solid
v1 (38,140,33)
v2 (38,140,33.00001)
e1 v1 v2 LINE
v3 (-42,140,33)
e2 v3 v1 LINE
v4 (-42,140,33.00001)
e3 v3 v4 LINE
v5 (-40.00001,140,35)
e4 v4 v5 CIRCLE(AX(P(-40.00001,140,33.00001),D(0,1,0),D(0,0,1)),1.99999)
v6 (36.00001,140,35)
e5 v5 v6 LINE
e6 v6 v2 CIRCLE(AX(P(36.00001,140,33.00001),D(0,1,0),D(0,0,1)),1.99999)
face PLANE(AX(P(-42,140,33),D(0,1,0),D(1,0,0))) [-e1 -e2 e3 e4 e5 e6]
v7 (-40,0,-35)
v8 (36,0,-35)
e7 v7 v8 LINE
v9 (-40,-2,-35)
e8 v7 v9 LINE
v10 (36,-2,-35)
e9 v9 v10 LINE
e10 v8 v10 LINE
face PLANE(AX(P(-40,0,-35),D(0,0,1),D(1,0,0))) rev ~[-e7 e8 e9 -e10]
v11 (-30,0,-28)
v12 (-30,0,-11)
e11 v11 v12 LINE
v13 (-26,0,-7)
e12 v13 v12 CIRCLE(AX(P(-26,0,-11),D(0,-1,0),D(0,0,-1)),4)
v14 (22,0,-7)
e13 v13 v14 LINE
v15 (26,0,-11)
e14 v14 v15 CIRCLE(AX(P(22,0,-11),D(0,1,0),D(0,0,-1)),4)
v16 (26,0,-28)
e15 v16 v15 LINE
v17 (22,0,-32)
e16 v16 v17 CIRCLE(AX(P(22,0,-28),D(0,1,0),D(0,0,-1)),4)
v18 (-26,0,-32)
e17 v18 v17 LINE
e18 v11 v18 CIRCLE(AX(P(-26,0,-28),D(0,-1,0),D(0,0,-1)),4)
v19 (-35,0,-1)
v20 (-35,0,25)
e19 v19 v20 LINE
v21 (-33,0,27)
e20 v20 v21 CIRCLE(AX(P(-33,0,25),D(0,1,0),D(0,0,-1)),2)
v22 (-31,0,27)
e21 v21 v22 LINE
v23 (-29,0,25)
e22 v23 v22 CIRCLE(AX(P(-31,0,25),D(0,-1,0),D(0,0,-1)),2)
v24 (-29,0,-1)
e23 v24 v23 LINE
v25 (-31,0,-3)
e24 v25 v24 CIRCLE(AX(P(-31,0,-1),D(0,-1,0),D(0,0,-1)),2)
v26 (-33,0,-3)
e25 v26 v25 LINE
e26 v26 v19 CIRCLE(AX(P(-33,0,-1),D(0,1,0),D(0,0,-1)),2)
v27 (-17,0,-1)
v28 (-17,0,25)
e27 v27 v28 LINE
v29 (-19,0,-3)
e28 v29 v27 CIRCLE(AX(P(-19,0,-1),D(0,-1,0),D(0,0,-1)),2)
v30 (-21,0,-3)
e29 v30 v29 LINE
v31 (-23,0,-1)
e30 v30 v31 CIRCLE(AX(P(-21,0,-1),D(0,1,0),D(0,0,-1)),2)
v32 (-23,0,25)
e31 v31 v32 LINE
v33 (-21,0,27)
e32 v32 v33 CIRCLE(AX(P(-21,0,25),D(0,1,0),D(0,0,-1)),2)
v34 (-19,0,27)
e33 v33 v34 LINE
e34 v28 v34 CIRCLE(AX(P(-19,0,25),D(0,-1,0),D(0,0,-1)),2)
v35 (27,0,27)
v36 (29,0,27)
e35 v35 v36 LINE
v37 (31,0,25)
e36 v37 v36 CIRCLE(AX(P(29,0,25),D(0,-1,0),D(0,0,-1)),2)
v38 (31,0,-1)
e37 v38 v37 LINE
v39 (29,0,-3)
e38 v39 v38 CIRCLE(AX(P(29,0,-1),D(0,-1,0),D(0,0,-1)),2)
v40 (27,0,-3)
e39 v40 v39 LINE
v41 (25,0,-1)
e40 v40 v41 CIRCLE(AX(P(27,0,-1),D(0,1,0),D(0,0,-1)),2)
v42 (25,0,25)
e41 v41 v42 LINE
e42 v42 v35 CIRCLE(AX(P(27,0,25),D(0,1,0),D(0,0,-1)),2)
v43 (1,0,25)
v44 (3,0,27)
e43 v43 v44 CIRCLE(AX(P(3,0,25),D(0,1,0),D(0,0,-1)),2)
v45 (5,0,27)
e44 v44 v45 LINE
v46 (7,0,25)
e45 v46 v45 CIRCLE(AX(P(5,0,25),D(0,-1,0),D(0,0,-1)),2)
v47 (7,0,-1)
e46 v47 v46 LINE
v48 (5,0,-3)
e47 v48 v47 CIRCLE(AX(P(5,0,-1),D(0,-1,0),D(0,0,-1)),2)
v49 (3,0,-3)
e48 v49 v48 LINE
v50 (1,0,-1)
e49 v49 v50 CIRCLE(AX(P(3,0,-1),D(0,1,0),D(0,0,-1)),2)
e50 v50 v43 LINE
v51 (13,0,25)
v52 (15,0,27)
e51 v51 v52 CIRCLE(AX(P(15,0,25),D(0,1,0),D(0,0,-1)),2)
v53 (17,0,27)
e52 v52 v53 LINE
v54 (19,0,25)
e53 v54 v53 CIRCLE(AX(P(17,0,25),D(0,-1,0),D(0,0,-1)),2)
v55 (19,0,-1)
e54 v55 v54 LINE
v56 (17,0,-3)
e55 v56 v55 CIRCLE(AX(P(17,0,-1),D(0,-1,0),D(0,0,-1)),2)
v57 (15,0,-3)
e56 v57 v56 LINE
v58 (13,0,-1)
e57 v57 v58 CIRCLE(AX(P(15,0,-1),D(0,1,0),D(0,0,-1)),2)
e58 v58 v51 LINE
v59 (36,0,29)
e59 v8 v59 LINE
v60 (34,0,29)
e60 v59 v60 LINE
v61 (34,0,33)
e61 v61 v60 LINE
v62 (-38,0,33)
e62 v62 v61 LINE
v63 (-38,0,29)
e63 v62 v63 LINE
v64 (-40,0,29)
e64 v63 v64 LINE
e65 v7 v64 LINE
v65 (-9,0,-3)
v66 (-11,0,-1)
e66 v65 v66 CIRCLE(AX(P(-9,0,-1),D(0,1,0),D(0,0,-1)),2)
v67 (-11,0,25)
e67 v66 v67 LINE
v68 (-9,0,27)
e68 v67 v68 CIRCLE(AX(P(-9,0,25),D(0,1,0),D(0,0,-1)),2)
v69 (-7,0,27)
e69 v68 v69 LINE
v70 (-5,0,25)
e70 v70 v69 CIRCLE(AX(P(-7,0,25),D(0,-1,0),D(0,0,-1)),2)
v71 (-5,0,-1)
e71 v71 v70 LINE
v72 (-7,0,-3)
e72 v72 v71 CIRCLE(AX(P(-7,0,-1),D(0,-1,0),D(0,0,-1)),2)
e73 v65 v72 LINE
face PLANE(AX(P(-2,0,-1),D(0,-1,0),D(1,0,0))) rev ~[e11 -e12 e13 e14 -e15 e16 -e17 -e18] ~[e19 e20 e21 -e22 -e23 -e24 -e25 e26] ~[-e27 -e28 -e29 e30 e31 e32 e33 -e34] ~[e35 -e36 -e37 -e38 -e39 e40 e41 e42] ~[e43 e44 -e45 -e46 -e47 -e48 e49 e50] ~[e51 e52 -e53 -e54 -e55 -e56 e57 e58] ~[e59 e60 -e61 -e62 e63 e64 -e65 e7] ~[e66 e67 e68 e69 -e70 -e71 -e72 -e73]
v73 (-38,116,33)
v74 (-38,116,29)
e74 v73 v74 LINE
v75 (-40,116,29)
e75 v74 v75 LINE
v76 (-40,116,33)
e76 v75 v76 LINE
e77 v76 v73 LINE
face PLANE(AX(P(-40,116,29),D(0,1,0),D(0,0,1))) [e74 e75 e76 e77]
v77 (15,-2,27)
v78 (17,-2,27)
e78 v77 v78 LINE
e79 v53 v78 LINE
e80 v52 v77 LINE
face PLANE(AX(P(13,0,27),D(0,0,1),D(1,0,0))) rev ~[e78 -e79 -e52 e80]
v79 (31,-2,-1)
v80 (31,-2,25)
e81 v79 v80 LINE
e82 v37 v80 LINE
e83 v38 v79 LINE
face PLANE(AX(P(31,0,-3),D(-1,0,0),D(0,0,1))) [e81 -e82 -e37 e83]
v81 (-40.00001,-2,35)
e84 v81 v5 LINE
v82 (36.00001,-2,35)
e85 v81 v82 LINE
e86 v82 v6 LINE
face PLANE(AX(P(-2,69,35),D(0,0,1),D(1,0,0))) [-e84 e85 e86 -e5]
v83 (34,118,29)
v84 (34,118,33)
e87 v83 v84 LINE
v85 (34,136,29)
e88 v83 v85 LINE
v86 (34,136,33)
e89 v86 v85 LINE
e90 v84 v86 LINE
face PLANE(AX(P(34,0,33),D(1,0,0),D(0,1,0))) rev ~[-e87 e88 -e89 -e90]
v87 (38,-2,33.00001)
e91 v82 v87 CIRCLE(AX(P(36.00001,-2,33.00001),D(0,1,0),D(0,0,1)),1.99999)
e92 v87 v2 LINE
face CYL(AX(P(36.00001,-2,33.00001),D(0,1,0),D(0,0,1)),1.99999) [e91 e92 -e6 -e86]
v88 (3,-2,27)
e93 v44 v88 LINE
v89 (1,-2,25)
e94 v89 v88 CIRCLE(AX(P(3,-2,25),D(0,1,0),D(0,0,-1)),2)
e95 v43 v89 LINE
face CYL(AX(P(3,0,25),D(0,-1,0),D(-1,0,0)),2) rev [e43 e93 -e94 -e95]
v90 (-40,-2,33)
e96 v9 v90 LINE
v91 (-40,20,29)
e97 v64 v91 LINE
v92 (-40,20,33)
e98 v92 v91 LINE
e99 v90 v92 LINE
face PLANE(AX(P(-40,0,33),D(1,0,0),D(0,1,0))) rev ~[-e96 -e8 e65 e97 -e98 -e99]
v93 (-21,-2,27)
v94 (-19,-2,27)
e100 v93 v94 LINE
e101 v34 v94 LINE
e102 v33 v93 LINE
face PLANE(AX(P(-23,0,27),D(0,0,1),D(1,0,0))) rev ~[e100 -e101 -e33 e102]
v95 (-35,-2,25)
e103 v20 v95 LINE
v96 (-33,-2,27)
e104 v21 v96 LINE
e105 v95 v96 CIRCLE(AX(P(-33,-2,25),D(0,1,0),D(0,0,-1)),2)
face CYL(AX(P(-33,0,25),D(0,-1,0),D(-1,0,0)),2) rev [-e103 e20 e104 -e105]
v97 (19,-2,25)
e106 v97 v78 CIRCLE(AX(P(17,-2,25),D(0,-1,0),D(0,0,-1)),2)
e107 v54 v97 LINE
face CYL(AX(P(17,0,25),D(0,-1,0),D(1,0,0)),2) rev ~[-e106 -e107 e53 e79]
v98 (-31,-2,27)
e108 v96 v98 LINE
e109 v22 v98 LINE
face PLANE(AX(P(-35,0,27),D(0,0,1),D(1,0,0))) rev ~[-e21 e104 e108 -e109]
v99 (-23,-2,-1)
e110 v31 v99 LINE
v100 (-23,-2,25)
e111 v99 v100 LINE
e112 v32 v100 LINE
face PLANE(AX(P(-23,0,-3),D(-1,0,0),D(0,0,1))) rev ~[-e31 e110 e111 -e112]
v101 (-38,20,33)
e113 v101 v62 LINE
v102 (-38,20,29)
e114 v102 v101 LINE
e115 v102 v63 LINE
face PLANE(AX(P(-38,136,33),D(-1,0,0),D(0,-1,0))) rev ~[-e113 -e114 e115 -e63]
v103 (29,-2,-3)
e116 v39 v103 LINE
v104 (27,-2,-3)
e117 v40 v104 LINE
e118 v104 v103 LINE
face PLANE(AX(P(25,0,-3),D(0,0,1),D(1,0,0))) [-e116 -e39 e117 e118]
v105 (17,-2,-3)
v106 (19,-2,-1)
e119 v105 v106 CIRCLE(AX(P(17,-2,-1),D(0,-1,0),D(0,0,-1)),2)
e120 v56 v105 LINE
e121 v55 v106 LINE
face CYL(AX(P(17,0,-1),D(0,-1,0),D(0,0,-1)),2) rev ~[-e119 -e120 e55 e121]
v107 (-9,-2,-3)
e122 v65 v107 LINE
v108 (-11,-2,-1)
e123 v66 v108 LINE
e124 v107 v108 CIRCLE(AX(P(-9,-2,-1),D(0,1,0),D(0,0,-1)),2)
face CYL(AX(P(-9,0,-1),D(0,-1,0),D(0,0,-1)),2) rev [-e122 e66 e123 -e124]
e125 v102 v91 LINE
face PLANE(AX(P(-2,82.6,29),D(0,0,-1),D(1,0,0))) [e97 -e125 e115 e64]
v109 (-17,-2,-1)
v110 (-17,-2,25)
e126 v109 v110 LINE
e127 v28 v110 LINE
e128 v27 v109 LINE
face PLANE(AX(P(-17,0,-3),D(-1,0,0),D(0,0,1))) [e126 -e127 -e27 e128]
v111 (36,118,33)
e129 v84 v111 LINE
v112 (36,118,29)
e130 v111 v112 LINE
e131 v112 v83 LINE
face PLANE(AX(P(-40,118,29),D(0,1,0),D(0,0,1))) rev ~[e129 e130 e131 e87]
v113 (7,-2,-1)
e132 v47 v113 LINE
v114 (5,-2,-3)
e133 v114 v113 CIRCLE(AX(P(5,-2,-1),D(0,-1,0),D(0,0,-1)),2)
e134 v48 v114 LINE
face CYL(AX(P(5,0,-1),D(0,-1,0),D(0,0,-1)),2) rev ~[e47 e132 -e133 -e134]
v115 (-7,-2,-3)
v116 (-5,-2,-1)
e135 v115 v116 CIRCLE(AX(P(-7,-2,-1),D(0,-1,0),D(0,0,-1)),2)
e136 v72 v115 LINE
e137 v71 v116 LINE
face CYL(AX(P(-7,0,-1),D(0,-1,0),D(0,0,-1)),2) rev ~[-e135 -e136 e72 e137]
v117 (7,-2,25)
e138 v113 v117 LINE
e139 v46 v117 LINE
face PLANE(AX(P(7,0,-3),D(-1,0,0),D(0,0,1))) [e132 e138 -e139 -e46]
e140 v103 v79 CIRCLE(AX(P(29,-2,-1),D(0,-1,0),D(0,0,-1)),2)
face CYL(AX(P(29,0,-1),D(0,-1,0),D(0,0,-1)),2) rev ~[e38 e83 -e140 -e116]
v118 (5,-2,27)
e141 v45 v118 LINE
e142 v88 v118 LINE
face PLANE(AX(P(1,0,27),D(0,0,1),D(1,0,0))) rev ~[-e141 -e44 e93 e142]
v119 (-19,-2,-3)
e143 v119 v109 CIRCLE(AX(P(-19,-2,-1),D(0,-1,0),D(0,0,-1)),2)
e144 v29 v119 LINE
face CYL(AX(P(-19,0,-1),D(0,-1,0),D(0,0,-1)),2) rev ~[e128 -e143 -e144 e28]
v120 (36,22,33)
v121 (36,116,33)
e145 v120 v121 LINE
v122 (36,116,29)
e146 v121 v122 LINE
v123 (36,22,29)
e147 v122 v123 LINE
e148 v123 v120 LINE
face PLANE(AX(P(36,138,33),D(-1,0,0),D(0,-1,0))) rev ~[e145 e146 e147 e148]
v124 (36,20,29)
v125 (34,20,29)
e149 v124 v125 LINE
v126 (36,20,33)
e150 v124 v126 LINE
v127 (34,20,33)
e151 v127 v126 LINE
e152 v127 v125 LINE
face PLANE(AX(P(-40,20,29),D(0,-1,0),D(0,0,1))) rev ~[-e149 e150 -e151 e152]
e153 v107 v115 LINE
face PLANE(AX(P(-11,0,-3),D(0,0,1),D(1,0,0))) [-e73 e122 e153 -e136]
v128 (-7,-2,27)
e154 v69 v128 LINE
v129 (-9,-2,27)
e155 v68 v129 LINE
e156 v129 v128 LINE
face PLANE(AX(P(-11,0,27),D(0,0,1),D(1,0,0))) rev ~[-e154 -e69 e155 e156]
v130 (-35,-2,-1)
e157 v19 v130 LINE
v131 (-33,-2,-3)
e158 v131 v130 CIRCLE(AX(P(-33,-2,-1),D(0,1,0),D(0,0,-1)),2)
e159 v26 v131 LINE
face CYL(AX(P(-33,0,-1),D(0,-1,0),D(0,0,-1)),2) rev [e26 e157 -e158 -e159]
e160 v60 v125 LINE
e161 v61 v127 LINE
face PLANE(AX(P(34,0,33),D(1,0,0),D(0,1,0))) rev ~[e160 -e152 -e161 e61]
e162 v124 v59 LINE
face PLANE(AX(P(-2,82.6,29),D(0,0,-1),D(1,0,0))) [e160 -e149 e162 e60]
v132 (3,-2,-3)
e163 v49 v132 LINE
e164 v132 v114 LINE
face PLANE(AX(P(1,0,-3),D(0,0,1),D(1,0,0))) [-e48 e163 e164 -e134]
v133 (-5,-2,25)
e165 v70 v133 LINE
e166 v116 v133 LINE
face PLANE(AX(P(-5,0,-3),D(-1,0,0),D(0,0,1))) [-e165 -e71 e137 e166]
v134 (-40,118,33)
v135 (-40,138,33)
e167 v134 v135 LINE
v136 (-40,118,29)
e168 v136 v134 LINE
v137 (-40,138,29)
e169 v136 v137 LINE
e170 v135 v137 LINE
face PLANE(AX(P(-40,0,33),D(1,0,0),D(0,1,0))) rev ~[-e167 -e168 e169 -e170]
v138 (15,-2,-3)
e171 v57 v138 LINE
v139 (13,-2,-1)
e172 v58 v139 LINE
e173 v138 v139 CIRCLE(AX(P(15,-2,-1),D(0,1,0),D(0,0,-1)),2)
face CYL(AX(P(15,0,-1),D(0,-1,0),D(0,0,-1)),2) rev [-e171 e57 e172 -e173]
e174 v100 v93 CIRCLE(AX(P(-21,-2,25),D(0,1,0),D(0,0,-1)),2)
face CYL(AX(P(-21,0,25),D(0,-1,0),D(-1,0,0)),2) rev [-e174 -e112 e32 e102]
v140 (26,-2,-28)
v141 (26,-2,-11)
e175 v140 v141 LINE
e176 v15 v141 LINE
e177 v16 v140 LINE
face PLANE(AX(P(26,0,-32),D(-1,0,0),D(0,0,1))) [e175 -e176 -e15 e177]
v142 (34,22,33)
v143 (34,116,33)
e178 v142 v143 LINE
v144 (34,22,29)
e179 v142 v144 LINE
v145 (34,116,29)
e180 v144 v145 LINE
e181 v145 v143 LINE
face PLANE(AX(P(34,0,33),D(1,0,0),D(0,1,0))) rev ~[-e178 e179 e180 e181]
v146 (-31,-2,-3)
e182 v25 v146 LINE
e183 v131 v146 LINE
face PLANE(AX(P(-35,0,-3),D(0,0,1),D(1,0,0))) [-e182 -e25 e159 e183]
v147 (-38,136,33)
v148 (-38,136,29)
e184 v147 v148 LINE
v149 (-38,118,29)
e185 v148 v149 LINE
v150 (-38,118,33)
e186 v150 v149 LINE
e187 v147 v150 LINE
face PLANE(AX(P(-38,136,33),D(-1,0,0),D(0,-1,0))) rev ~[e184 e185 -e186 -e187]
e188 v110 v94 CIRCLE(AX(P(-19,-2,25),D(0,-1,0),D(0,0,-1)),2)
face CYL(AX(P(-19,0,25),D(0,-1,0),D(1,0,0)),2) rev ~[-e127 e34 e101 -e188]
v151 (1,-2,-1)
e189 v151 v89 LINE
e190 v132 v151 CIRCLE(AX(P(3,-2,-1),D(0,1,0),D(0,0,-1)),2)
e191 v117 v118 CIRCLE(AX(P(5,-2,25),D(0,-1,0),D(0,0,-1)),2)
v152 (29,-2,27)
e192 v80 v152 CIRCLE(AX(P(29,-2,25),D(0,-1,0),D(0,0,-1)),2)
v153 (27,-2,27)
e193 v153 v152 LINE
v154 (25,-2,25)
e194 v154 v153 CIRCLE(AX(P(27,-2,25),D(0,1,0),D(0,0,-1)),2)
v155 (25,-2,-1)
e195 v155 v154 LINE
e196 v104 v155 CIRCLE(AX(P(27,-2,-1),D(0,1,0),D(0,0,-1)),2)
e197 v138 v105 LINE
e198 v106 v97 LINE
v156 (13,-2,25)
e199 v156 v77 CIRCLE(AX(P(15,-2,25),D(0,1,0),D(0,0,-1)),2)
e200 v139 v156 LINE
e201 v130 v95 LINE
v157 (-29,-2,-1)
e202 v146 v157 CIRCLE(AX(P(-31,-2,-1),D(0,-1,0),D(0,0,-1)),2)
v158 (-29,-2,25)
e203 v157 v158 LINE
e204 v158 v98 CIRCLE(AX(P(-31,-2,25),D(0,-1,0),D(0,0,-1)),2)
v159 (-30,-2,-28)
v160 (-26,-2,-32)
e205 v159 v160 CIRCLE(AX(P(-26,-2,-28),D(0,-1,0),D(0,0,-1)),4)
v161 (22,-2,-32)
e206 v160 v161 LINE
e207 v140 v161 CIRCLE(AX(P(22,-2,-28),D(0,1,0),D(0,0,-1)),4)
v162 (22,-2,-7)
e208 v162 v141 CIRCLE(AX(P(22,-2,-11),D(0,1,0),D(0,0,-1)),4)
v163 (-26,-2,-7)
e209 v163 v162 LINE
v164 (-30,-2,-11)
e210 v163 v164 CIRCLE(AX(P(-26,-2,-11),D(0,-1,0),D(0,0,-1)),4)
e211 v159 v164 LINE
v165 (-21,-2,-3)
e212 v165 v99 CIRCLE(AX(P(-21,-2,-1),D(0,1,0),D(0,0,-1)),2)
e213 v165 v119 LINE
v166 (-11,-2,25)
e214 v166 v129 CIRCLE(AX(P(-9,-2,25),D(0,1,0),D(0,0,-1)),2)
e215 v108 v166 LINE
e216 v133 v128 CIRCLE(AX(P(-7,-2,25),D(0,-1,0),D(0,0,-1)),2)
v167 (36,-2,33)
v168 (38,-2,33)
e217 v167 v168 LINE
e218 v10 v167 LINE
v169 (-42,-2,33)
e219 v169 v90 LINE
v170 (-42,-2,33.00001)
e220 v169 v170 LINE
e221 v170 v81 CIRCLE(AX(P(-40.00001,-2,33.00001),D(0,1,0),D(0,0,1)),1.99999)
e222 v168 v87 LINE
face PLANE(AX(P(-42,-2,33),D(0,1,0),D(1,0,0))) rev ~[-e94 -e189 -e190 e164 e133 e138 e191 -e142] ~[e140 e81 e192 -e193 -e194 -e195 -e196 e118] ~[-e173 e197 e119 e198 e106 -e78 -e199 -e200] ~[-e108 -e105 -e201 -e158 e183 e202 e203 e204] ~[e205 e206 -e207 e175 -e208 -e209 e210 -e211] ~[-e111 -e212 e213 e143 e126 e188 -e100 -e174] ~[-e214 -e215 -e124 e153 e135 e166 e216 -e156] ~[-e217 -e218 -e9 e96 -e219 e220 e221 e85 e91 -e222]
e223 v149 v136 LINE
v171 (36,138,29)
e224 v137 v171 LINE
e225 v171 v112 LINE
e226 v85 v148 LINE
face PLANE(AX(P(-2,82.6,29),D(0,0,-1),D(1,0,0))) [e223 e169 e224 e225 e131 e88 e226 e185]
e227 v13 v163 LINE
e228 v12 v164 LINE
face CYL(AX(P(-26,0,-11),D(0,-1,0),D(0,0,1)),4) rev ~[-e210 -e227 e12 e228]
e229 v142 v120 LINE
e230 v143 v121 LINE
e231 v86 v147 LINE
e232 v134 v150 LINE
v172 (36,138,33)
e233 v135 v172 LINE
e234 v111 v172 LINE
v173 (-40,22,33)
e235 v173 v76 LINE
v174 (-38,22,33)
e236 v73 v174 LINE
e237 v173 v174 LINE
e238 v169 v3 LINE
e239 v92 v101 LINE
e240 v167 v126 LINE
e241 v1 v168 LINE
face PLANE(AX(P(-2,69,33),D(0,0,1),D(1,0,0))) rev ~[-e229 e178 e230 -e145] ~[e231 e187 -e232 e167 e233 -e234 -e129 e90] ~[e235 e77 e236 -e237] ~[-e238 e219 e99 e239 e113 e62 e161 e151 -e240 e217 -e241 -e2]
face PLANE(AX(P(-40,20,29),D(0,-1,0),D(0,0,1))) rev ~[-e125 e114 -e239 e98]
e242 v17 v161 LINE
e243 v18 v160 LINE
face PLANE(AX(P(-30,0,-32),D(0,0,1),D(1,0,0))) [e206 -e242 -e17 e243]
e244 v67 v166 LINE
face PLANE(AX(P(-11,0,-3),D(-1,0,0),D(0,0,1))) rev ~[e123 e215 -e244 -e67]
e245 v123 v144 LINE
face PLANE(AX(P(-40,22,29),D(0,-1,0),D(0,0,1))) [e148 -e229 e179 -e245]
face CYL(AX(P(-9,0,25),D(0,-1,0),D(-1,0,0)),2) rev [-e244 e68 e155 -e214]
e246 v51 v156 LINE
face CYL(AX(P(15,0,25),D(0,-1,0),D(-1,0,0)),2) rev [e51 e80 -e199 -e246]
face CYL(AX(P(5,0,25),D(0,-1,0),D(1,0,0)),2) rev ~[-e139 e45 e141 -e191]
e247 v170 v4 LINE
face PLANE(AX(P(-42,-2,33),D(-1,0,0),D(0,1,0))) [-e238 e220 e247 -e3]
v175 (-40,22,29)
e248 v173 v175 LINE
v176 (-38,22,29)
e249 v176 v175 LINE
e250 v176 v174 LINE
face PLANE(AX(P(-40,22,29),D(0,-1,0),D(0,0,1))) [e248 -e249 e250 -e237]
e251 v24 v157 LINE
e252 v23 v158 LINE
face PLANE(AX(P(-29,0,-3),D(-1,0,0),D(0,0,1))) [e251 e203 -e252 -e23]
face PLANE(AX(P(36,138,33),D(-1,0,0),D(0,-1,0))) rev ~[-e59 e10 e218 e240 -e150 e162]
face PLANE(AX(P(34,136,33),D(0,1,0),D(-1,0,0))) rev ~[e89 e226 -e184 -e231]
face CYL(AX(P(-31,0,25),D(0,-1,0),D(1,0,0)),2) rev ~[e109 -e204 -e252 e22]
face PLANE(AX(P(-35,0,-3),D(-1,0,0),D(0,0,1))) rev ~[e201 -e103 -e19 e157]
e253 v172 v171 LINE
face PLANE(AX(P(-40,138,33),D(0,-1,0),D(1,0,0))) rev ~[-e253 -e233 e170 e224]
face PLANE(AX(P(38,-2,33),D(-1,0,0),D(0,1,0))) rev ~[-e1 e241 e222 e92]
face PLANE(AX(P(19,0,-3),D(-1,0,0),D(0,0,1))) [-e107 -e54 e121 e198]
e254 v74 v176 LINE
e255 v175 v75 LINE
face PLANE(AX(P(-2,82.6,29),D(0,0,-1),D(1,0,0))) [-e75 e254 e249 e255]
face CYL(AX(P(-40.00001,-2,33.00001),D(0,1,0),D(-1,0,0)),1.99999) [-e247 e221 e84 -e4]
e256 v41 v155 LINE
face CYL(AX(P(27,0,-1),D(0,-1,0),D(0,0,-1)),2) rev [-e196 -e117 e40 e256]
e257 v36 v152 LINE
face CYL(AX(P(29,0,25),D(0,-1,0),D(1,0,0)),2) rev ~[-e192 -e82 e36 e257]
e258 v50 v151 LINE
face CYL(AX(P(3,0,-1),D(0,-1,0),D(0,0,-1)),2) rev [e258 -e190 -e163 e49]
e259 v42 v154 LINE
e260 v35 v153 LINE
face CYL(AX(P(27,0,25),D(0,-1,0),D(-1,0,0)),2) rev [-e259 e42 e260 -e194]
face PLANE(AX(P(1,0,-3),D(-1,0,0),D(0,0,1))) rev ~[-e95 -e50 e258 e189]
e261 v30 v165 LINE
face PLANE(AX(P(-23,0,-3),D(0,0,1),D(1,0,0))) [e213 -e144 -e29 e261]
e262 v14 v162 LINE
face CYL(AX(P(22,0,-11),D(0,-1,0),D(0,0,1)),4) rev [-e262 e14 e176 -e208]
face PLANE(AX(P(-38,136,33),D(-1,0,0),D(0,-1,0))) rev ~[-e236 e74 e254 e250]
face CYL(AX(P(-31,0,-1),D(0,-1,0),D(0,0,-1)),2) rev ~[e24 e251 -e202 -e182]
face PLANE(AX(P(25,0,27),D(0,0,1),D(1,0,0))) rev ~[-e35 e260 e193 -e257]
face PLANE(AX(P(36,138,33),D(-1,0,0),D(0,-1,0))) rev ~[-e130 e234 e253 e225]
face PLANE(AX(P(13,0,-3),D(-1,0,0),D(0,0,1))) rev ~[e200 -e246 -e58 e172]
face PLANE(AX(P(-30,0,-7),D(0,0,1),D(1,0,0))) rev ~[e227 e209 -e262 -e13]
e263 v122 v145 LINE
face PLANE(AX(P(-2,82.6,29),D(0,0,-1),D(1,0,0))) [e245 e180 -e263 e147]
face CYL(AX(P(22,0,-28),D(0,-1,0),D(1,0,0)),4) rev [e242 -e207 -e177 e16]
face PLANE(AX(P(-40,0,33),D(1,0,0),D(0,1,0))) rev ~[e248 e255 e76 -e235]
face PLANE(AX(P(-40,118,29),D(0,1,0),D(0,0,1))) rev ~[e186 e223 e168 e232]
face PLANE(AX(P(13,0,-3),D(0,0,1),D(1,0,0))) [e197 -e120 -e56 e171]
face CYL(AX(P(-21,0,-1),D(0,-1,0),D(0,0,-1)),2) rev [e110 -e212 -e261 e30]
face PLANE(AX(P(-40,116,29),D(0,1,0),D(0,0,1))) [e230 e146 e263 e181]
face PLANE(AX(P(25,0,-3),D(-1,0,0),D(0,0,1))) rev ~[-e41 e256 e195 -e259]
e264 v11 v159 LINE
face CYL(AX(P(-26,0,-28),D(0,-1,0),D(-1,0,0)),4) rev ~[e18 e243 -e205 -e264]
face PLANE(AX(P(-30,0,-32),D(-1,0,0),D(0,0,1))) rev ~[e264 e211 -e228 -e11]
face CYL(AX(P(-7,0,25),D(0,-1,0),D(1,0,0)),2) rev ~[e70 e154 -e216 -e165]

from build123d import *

# Parameters (mm, degrees)
F0_W      = 76
F0_H      = 68
F0_W_2    = 56
F0_H_2    = 25
F0_W_3    = 6
F0_H_3    = 30
F1_DEPTH  = 2
F2_W      = 80
F2_H      = 142
F3_DEPTH  = 2
F4_R      = 1.99999
F6_DEPTH  = 4
F7_R      = 4
F8_R      = 2
F9_W      = 2
F9_H      = 4
F10_DEPTH = 100


# Not quite as in the source:
# - a fillet or chamfer is up to 0.001 mm smaller than in the source, because OpenCascade refuses the exact size


with BuildPart() as f1:
    # F0 (on Front) → F1 (new body)
    with BuildSketch(Plane.XZ):
        with Locations((-2, -1)):
            Rectangle(F0_W, F0_H)
        with Locations((-2, -19.5)):
            Rectangle(F0_W_2, F0_H_2, mode=Mode.SUBTRACT)
        with Locations((-32, 12)):
            Rectangle(F0_W_3, F0_H_3, mode=Mode.SUBTRACT)
        with Locations((-20, 12)):
            Rectangle(F0_W_3, F0_H_3, mode=Mode.SUBTRACT)
        with Locations((-8, 12)):
            Rectangle(F0_W_3, F0_H_3, mode=Mode.SUBTRACT)
        with Locations((4, 12)):
            Rectangle(F0_W_3, F0_H_3, mode=Mode.SUBTRACT)
        with Locations((16, 12)):
            Rectangle(F0_W_3, F0_H_3, mode=Mode.SUBTRACT)
        with Locations((28, 12)):
            Rectangle(F0_W_3, F0_H_3, mode=Mode.SUBTRACT)
    extrude(amount=F1_DEPTH)

    # F2 (on face) → F3 (join)
    with BuildSketch(Plane.XY.offset(33)):
        with Locations((-2, 69)):
            Rectangle(F2_W, F2_H)
    extrude(amount=F3_DEPTH)

    # F4 (radius 2 in the source; OpenCascade refuses exactly that, so slightly less here)
    f4_edges = [f1.edges().sort_by_distance(p)[0] for p in [
        (38, 69, 35),
        (-42, 69, 35),
    ]]
    fillet(f4_edges, radius=F4_R)

    # F5 (on face) → F6 (join)
    with BuildSketch(Plane(origin=(0, 0, 33), x_dir=(1, 0, 0), z_dir=(0, 0, -1))):
        Polygon((-38, 0), (-40, 0), (-40, -138), (36, -138), (36, 0), (34, 0), (34, -136), (-38, -136), align=None)
    extrude(amount=F6_DEPTH)

    # F7
    f7_edges = [f1.edges().sort_by_distance(p)[0] for p in [
        (-30, -1, -7),
        (26, -1, -7),
        (-30, -1, -32),
        (26, -1, -32),
    ]]
    fillet(f7_edges, radius=F7_R)

    # F8
    f8_edges = [f1.edges().sort_by_distance(p)[0] for p in [
        (-35, -1, 27),
        (-29, -1, 27),
        (-35, -1, -3),
        (-29, -1, -3),
        (-23, -1, 27),
        (-17, -1, 27),
        (-23, -1, -3),
        (-17, -1, -3),
        (-11, -1, -3),
        (-11, -1, 27),
        (-5, -1, 27),
        (-5, -1, -3),
        (1, -1, -3),
        (7, -1, -3),
        (7, -1, 27),
        (1, -1, 27),
        (13, -1, 27),
        (19, -1, 27),
        (19, -1, -3),
        (13, -1, -3),
        (25, -1, -3),
        (31, -1, -3),
        (25, -1, 27),
        (31, -1, 27),
    ]]
    fillet(f8_edges, radius=F8_R)

    # F9 (on face) → F10 (cut, symmetric)
    with BuildSketch(Plane(origin=(-40, 0, 0), x_dir=(0, -1, 0), z_dir=(-1, 0, 0))):
        with Locations((-117, 31)):
            Rectangle(F9_W, F9_H)
        with Locations((-21, 31)):
            Rectangle(F9_W, F9_H)
    extrude(amount=F10_DEPTH, both=True, mode=Mode.SUBTRACT)


solid = f1.part
